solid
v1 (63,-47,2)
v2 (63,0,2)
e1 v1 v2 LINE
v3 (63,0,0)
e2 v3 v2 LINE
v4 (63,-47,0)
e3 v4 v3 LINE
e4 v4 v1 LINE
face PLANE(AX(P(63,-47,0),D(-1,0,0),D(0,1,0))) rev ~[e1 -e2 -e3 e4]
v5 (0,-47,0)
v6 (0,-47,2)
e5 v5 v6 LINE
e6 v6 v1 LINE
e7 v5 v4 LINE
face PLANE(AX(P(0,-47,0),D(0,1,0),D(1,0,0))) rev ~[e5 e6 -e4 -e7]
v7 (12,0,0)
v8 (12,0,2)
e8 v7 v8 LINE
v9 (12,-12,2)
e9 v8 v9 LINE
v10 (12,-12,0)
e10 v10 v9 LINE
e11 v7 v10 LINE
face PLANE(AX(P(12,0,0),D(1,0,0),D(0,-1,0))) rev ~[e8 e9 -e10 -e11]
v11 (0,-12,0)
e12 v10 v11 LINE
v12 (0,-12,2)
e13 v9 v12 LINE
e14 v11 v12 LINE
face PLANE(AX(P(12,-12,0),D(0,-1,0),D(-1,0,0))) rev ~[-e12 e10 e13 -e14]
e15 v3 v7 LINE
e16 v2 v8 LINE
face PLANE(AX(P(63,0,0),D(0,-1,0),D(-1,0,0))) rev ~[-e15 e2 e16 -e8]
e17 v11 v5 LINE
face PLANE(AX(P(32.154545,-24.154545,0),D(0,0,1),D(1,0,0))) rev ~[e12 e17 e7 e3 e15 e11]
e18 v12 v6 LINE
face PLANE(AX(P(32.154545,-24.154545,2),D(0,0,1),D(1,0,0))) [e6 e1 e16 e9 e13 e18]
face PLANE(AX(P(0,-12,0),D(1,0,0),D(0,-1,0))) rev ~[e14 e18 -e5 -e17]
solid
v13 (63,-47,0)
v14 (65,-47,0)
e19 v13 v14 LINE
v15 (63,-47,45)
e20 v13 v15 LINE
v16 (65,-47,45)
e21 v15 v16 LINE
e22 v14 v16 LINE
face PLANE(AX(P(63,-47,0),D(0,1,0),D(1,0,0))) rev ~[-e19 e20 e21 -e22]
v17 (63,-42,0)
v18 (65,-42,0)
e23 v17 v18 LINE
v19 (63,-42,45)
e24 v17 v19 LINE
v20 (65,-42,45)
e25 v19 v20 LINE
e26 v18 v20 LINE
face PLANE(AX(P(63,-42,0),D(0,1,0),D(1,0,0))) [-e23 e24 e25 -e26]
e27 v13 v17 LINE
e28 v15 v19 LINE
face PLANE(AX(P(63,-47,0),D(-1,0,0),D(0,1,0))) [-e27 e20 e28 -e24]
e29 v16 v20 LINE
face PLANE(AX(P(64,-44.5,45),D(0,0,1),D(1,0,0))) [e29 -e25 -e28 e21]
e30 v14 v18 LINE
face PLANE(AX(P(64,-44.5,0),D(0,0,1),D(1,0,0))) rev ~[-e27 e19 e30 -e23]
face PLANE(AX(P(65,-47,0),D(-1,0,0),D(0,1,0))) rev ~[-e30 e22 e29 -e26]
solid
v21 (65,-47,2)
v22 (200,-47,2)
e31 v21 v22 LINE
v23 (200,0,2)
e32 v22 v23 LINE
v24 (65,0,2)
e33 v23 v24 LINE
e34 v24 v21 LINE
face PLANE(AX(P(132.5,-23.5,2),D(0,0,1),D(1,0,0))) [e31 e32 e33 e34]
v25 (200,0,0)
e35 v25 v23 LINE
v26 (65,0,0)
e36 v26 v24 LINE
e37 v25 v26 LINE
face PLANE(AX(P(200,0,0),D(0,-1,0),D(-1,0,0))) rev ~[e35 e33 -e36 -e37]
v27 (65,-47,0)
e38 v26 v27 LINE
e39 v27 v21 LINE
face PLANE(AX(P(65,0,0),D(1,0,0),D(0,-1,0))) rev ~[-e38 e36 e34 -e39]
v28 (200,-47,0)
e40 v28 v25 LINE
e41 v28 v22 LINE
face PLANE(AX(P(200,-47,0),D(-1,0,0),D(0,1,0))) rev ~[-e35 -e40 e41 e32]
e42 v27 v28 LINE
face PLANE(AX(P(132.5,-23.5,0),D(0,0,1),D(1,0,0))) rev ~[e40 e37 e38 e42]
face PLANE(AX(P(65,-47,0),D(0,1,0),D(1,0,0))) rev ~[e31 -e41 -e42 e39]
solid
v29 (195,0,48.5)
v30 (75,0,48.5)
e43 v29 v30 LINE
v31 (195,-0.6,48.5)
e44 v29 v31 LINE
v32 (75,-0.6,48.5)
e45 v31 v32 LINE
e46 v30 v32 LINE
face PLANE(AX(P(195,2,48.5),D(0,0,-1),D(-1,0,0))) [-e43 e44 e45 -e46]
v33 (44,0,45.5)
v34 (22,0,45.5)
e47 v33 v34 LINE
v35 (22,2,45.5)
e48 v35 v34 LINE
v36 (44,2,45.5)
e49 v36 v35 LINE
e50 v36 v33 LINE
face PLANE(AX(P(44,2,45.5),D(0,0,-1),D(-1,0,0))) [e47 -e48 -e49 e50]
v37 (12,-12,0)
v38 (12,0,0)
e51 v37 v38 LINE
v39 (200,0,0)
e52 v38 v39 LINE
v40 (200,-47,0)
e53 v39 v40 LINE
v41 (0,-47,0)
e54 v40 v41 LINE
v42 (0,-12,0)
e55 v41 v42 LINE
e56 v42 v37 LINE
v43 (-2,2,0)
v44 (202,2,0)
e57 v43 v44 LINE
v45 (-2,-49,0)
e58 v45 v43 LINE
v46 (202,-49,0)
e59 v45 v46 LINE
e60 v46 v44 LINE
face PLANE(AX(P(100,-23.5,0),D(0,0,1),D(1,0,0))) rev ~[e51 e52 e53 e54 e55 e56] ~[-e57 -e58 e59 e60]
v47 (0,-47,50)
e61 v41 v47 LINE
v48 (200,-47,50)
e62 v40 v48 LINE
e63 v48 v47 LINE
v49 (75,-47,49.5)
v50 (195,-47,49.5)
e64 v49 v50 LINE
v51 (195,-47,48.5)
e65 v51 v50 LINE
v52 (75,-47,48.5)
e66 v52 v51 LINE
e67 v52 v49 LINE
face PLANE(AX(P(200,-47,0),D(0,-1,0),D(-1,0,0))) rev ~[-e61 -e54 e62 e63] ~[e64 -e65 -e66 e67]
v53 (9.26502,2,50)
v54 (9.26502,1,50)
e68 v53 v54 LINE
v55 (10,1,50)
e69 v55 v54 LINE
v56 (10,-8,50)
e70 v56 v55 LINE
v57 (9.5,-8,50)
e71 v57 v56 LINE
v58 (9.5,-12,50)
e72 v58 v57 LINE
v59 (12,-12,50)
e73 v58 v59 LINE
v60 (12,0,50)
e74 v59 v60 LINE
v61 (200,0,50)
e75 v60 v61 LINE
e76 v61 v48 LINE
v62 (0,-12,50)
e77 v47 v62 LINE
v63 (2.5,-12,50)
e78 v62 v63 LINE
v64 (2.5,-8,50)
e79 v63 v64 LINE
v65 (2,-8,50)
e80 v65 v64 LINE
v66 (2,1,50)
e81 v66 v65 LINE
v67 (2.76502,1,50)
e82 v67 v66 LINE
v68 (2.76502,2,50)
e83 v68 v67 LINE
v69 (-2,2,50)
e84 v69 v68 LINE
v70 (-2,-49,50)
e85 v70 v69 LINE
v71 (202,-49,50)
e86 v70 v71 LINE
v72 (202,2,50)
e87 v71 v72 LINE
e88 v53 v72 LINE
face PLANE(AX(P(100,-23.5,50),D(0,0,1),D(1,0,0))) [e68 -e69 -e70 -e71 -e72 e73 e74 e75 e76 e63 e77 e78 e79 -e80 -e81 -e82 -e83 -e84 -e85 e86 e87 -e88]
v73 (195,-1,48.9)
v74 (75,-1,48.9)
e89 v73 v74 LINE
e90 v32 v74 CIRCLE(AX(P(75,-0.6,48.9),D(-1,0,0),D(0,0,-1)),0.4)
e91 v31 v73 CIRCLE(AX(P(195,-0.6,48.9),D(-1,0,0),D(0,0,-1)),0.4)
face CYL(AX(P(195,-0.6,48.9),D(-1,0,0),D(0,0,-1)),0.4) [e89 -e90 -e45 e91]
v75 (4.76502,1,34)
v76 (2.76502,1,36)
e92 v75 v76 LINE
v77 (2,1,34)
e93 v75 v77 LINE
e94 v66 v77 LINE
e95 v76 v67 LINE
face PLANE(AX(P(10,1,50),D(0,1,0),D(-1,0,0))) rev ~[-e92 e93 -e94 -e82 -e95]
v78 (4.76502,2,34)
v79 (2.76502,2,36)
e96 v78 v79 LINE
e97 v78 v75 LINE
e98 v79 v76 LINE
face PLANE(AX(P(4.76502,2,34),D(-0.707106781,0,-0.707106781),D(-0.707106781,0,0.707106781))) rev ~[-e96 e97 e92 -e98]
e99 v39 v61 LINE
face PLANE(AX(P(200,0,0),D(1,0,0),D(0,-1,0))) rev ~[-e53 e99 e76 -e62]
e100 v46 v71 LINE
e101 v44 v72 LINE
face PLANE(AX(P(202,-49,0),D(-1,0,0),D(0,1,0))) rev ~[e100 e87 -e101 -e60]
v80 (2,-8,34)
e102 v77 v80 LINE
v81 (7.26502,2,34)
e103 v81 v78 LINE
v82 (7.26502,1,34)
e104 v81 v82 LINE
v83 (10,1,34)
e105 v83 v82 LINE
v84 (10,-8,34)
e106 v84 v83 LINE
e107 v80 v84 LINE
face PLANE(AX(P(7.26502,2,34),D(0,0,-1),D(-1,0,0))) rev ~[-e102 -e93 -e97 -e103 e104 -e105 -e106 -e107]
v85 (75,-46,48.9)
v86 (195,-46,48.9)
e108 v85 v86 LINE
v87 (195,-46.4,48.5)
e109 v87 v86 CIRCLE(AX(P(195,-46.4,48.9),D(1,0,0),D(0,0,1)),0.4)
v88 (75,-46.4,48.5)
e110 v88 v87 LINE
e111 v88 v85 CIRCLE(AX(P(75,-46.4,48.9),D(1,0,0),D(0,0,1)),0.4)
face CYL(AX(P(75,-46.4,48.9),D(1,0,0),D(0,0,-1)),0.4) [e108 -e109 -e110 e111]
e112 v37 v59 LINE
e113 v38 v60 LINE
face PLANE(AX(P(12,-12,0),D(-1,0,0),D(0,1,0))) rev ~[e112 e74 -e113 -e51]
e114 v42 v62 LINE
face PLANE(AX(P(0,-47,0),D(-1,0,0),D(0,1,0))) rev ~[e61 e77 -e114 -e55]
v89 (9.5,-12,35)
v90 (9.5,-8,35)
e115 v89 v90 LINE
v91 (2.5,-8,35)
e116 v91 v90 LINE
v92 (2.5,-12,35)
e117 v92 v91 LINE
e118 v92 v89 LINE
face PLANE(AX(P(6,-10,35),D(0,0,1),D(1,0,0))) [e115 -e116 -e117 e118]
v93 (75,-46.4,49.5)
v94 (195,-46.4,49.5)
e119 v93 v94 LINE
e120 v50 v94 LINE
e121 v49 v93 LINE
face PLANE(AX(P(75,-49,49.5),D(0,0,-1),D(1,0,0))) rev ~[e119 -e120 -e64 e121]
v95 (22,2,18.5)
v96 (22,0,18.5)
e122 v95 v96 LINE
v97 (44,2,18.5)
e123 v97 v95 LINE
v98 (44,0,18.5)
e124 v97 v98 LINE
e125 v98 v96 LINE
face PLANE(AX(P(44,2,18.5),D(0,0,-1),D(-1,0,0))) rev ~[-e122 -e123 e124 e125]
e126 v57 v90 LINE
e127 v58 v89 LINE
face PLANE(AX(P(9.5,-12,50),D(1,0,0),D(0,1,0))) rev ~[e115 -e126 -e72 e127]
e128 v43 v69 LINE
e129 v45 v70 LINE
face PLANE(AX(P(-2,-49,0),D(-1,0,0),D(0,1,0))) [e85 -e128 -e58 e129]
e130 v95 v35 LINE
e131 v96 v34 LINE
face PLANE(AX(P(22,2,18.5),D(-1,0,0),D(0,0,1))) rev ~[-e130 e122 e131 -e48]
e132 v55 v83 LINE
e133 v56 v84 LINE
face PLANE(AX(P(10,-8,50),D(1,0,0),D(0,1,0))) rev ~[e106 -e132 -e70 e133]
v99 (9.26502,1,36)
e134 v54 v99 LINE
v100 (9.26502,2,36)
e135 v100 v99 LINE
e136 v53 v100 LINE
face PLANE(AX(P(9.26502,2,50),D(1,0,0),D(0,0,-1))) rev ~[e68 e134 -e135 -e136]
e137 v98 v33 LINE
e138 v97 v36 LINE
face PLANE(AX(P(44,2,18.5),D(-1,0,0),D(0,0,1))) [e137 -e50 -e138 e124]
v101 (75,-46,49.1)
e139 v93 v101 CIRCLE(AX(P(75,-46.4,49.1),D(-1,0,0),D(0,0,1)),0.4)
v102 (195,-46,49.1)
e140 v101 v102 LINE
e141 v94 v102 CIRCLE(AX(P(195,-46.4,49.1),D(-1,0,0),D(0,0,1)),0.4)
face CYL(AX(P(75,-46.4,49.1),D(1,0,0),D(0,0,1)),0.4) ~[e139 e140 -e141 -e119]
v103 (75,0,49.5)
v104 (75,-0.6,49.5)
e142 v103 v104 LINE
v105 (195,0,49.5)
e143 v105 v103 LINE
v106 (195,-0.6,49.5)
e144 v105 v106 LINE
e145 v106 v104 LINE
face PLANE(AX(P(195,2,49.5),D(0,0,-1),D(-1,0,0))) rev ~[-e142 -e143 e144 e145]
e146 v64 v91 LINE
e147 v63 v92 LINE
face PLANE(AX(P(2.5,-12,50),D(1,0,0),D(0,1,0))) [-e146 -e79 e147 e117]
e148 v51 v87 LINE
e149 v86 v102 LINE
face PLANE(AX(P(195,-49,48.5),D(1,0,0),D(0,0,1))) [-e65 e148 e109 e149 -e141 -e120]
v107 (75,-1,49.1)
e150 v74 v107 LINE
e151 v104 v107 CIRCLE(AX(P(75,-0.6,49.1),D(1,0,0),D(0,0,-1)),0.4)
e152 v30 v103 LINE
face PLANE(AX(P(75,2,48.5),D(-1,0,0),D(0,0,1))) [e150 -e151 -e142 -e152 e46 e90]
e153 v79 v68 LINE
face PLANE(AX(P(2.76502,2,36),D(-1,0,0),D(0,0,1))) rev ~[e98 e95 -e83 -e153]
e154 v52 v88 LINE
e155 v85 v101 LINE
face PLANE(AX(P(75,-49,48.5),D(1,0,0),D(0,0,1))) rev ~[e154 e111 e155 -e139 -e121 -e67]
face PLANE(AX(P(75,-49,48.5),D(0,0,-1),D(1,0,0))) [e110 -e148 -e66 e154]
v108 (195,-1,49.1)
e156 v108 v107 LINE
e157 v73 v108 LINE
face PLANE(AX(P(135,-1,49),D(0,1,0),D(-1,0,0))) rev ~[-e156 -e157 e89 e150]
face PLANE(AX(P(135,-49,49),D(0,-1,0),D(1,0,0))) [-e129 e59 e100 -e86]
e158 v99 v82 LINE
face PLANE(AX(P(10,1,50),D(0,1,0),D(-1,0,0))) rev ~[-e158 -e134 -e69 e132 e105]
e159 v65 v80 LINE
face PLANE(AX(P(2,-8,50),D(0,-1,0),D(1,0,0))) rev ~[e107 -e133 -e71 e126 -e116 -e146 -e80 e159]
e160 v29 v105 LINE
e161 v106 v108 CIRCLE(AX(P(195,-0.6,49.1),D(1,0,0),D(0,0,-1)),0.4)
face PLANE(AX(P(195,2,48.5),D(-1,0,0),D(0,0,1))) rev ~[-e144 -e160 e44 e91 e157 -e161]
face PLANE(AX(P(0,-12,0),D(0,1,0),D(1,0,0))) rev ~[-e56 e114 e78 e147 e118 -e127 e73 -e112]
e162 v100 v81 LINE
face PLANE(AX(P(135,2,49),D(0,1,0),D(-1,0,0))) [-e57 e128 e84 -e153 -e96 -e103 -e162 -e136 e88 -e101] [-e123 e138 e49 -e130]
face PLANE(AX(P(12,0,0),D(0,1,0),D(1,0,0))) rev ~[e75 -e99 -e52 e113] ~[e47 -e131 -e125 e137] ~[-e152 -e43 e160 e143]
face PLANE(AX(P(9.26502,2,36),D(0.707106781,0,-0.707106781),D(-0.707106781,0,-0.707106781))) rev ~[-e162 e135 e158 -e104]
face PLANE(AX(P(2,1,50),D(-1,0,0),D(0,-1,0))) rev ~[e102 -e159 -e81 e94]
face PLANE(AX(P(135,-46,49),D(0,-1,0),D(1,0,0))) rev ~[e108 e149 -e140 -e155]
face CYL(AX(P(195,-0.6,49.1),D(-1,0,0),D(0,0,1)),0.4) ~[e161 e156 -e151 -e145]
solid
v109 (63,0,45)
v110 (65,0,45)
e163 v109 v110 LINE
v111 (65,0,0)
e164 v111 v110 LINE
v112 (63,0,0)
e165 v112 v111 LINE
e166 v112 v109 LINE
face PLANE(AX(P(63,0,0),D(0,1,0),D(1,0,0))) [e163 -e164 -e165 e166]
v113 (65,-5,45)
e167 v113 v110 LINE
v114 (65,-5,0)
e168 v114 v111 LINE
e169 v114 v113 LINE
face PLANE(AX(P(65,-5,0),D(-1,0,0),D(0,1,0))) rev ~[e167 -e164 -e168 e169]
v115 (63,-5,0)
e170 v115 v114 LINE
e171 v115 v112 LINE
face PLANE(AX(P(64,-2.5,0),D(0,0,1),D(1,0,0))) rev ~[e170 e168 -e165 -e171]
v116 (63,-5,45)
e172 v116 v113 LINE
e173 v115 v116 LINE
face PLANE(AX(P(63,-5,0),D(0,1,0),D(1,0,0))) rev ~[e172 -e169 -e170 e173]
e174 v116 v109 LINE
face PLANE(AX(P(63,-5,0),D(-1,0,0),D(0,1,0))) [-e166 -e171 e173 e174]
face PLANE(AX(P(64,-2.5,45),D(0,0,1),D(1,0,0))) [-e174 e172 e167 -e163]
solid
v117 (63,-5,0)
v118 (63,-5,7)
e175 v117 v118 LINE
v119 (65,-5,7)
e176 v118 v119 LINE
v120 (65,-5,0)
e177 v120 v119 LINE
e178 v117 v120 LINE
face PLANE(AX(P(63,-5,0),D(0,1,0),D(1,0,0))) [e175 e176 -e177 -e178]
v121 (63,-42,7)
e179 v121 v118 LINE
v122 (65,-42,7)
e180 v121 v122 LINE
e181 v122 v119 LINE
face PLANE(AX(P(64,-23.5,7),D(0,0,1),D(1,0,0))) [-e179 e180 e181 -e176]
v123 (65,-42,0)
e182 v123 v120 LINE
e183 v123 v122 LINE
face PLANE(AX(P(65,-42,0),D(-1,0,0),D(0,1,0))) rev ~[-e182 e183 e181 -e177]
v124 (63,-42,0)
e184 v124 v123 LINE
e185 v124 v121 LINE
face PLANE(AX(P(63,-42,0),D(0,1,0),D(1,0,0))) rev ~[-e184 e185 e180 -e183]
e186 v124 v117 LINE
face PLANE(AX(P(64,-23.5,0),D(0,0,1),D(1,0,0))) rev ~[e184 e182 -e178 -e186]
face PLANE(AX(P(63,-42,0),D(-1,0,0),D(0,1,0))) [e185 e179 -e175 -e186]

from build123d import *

# Parameters (mm, degrees)
F1_DEPTH  = 2
F0_W      = 204
F0_H      = 51
F0_W_2    = 12
F0_H_2    = 12
F2_DEPTH  = 50
F0_W_3    = 2
F0_H_3    = 37
F3_DEPTH  = 7
F0_H_4    = 5
F4_DEPTH  = 45
F6_DEPTH  = 16
F5_W      = 7
F5_H      = 4
F7_DEPTH  = 15
F8_W      = 22
F8_H      = 27
F9_DEPTH  = 5
F10_W     = 120
F10_H     = 1
F11_DEPTH = 3
F12_W     = 120
F12_H     = 1
F13_DEPTH = 3
F14_R     = 0.4


# Not quite as in the source:
# - a feature names something its author has since deleted; it is built from what else it names


with BuildPart() as f1:
    # F0 (on Top) → F1 (new body)
    with BuildSketch(Plane.XY):
        Polygon((200, 0), (65, 0), (65, -5), (65, -42), (65, -47), (200, -47), align=None)
    extrude(amount=F1_DEPTH)


with BuildPart() as f1b:
    # F0 (on Top) → F1, piece 2 (new body)
    with BuildSketch(Plane.XY):
        Polygon((63, 0), (12, 0), (12, -12), (0, -12), (0, -47), (63, -47), (63, -42), (63, -5), align=None)
    extrude(amount=F1_DEPTH)


with BuildPart() as f2:
    # F0 (on Top) → F2 (new body)
    with BuildSketch(Plane.XY):
        with Locations((100, -23.5)):
            Rectangle(F0_W, F0_H)
        Polygon((0, -12), (0, 0), (12, 0), (63, 0), (65, 0), (200, 0), (200, -47), (65, -47), (63, -47), (0, -47), align=None, mode=Mode.SUBTRACT)
        with Locations((6, -6)):
            Rectangle(F0_W_2, F0_H_2)
    extrude(amount=F2_DEPTH)

    # F5 (on face) → F6 (cut)
    with BuildSketch(Plane.XY.offset(50)):
        Polygon((9.25, 1), (2.75, 1), (2, 1), (2, -8), (2.5, -8), (9.5, -8), (10, -8), (10, 1), align=None)
    extrude(amount=-F6_DEPTH, mode=Mode.SUBTRACT)

    # F5 (on face) → F7 (cut)
    with BuildSketch(Plane.XY.offset(50)):
        with Locations((6, -10)):
            Rectangle(F5_W, F5_H)
    extrude(amount=-F7_DEPTH, mode=Mode.SUBTRACT)

    # F8 (on face) → F9 (cut)
    with BuildSketch(Plane(origin=(0, 2, 0), x_dir=(-1, 0, 0), z_dir=(0, 1, 0))):
        Polygon((-7.265019957, 34), (-4.765019957, 34), (-2.765019957, 36), (-2.765019957, 50), (-9.265019957, 50), (-9.265019957, 36), align=None)
        with Locations((-33, 32)):
            Rectangle(F8_W, F8_H)
    extrude(amount=-F9_DEPTH, mode=Mode.SUBTRACT)

    # F10 (on face) → F11 (join)
    with BuildSketch(Plane.XZ.offset(49)):
        with Locations((135, 49)):
            Rectangle(F10_W, F10_H)
    extrude(amount=-F11_DEPTH)

    # F12 (on face) → F13 (join)
    with BuildSketch(Plane(origin=(0, 2, 0), x_dir=(-1, 0, 0), z_dir=(0, 1, 0))):
        with Locations((-135, 49)):
            Rectangle(F12_W, F12_H)
    extrude(amount=-F13_DEPTH)

    # F14
    f14_edges = [f2.edges().sort_by_distance(p)[0] for p in [
        (135, -46, 48.5),
        (135, -46, 49.5),
        (135, -1, 49.5),
        (135, -1, 48.5),
    ]]
    fillet(f14_edges, radius=F14_R)


with BuildPart() as f3:
    # F0 (on Top) → F3 (new body)
    with BuildSketch(Plane.XY):
        with Locations((64, -23.5)):
            Rectangle(F0_W_3, F0_H_3)
    extrude(amount=F3_DEPTH)


with BuildPart() as f4:
    # F0 (on Top) → F4 (new body)
    with BuildSketch(Plane.XY):
        with Locations((64, -44.5)):
            Rectangle(F0_W_3, F0_H_4)
    extrude(amount=F4_DEPTH)


with BuildPart() as f4b:
    # F0 (on Top) → F4, piece 2 (new body)
    with BuildSketch(Plane.XY):
        with Locations((64, -2.5)):
            Rectangle(F0_W_3, F0_H_4)
    extrude(amount=F4_DEPTH)


solid = Compound([f1.part, f1b.part, f2.part, f3.part, f4.part, f4b.part])
